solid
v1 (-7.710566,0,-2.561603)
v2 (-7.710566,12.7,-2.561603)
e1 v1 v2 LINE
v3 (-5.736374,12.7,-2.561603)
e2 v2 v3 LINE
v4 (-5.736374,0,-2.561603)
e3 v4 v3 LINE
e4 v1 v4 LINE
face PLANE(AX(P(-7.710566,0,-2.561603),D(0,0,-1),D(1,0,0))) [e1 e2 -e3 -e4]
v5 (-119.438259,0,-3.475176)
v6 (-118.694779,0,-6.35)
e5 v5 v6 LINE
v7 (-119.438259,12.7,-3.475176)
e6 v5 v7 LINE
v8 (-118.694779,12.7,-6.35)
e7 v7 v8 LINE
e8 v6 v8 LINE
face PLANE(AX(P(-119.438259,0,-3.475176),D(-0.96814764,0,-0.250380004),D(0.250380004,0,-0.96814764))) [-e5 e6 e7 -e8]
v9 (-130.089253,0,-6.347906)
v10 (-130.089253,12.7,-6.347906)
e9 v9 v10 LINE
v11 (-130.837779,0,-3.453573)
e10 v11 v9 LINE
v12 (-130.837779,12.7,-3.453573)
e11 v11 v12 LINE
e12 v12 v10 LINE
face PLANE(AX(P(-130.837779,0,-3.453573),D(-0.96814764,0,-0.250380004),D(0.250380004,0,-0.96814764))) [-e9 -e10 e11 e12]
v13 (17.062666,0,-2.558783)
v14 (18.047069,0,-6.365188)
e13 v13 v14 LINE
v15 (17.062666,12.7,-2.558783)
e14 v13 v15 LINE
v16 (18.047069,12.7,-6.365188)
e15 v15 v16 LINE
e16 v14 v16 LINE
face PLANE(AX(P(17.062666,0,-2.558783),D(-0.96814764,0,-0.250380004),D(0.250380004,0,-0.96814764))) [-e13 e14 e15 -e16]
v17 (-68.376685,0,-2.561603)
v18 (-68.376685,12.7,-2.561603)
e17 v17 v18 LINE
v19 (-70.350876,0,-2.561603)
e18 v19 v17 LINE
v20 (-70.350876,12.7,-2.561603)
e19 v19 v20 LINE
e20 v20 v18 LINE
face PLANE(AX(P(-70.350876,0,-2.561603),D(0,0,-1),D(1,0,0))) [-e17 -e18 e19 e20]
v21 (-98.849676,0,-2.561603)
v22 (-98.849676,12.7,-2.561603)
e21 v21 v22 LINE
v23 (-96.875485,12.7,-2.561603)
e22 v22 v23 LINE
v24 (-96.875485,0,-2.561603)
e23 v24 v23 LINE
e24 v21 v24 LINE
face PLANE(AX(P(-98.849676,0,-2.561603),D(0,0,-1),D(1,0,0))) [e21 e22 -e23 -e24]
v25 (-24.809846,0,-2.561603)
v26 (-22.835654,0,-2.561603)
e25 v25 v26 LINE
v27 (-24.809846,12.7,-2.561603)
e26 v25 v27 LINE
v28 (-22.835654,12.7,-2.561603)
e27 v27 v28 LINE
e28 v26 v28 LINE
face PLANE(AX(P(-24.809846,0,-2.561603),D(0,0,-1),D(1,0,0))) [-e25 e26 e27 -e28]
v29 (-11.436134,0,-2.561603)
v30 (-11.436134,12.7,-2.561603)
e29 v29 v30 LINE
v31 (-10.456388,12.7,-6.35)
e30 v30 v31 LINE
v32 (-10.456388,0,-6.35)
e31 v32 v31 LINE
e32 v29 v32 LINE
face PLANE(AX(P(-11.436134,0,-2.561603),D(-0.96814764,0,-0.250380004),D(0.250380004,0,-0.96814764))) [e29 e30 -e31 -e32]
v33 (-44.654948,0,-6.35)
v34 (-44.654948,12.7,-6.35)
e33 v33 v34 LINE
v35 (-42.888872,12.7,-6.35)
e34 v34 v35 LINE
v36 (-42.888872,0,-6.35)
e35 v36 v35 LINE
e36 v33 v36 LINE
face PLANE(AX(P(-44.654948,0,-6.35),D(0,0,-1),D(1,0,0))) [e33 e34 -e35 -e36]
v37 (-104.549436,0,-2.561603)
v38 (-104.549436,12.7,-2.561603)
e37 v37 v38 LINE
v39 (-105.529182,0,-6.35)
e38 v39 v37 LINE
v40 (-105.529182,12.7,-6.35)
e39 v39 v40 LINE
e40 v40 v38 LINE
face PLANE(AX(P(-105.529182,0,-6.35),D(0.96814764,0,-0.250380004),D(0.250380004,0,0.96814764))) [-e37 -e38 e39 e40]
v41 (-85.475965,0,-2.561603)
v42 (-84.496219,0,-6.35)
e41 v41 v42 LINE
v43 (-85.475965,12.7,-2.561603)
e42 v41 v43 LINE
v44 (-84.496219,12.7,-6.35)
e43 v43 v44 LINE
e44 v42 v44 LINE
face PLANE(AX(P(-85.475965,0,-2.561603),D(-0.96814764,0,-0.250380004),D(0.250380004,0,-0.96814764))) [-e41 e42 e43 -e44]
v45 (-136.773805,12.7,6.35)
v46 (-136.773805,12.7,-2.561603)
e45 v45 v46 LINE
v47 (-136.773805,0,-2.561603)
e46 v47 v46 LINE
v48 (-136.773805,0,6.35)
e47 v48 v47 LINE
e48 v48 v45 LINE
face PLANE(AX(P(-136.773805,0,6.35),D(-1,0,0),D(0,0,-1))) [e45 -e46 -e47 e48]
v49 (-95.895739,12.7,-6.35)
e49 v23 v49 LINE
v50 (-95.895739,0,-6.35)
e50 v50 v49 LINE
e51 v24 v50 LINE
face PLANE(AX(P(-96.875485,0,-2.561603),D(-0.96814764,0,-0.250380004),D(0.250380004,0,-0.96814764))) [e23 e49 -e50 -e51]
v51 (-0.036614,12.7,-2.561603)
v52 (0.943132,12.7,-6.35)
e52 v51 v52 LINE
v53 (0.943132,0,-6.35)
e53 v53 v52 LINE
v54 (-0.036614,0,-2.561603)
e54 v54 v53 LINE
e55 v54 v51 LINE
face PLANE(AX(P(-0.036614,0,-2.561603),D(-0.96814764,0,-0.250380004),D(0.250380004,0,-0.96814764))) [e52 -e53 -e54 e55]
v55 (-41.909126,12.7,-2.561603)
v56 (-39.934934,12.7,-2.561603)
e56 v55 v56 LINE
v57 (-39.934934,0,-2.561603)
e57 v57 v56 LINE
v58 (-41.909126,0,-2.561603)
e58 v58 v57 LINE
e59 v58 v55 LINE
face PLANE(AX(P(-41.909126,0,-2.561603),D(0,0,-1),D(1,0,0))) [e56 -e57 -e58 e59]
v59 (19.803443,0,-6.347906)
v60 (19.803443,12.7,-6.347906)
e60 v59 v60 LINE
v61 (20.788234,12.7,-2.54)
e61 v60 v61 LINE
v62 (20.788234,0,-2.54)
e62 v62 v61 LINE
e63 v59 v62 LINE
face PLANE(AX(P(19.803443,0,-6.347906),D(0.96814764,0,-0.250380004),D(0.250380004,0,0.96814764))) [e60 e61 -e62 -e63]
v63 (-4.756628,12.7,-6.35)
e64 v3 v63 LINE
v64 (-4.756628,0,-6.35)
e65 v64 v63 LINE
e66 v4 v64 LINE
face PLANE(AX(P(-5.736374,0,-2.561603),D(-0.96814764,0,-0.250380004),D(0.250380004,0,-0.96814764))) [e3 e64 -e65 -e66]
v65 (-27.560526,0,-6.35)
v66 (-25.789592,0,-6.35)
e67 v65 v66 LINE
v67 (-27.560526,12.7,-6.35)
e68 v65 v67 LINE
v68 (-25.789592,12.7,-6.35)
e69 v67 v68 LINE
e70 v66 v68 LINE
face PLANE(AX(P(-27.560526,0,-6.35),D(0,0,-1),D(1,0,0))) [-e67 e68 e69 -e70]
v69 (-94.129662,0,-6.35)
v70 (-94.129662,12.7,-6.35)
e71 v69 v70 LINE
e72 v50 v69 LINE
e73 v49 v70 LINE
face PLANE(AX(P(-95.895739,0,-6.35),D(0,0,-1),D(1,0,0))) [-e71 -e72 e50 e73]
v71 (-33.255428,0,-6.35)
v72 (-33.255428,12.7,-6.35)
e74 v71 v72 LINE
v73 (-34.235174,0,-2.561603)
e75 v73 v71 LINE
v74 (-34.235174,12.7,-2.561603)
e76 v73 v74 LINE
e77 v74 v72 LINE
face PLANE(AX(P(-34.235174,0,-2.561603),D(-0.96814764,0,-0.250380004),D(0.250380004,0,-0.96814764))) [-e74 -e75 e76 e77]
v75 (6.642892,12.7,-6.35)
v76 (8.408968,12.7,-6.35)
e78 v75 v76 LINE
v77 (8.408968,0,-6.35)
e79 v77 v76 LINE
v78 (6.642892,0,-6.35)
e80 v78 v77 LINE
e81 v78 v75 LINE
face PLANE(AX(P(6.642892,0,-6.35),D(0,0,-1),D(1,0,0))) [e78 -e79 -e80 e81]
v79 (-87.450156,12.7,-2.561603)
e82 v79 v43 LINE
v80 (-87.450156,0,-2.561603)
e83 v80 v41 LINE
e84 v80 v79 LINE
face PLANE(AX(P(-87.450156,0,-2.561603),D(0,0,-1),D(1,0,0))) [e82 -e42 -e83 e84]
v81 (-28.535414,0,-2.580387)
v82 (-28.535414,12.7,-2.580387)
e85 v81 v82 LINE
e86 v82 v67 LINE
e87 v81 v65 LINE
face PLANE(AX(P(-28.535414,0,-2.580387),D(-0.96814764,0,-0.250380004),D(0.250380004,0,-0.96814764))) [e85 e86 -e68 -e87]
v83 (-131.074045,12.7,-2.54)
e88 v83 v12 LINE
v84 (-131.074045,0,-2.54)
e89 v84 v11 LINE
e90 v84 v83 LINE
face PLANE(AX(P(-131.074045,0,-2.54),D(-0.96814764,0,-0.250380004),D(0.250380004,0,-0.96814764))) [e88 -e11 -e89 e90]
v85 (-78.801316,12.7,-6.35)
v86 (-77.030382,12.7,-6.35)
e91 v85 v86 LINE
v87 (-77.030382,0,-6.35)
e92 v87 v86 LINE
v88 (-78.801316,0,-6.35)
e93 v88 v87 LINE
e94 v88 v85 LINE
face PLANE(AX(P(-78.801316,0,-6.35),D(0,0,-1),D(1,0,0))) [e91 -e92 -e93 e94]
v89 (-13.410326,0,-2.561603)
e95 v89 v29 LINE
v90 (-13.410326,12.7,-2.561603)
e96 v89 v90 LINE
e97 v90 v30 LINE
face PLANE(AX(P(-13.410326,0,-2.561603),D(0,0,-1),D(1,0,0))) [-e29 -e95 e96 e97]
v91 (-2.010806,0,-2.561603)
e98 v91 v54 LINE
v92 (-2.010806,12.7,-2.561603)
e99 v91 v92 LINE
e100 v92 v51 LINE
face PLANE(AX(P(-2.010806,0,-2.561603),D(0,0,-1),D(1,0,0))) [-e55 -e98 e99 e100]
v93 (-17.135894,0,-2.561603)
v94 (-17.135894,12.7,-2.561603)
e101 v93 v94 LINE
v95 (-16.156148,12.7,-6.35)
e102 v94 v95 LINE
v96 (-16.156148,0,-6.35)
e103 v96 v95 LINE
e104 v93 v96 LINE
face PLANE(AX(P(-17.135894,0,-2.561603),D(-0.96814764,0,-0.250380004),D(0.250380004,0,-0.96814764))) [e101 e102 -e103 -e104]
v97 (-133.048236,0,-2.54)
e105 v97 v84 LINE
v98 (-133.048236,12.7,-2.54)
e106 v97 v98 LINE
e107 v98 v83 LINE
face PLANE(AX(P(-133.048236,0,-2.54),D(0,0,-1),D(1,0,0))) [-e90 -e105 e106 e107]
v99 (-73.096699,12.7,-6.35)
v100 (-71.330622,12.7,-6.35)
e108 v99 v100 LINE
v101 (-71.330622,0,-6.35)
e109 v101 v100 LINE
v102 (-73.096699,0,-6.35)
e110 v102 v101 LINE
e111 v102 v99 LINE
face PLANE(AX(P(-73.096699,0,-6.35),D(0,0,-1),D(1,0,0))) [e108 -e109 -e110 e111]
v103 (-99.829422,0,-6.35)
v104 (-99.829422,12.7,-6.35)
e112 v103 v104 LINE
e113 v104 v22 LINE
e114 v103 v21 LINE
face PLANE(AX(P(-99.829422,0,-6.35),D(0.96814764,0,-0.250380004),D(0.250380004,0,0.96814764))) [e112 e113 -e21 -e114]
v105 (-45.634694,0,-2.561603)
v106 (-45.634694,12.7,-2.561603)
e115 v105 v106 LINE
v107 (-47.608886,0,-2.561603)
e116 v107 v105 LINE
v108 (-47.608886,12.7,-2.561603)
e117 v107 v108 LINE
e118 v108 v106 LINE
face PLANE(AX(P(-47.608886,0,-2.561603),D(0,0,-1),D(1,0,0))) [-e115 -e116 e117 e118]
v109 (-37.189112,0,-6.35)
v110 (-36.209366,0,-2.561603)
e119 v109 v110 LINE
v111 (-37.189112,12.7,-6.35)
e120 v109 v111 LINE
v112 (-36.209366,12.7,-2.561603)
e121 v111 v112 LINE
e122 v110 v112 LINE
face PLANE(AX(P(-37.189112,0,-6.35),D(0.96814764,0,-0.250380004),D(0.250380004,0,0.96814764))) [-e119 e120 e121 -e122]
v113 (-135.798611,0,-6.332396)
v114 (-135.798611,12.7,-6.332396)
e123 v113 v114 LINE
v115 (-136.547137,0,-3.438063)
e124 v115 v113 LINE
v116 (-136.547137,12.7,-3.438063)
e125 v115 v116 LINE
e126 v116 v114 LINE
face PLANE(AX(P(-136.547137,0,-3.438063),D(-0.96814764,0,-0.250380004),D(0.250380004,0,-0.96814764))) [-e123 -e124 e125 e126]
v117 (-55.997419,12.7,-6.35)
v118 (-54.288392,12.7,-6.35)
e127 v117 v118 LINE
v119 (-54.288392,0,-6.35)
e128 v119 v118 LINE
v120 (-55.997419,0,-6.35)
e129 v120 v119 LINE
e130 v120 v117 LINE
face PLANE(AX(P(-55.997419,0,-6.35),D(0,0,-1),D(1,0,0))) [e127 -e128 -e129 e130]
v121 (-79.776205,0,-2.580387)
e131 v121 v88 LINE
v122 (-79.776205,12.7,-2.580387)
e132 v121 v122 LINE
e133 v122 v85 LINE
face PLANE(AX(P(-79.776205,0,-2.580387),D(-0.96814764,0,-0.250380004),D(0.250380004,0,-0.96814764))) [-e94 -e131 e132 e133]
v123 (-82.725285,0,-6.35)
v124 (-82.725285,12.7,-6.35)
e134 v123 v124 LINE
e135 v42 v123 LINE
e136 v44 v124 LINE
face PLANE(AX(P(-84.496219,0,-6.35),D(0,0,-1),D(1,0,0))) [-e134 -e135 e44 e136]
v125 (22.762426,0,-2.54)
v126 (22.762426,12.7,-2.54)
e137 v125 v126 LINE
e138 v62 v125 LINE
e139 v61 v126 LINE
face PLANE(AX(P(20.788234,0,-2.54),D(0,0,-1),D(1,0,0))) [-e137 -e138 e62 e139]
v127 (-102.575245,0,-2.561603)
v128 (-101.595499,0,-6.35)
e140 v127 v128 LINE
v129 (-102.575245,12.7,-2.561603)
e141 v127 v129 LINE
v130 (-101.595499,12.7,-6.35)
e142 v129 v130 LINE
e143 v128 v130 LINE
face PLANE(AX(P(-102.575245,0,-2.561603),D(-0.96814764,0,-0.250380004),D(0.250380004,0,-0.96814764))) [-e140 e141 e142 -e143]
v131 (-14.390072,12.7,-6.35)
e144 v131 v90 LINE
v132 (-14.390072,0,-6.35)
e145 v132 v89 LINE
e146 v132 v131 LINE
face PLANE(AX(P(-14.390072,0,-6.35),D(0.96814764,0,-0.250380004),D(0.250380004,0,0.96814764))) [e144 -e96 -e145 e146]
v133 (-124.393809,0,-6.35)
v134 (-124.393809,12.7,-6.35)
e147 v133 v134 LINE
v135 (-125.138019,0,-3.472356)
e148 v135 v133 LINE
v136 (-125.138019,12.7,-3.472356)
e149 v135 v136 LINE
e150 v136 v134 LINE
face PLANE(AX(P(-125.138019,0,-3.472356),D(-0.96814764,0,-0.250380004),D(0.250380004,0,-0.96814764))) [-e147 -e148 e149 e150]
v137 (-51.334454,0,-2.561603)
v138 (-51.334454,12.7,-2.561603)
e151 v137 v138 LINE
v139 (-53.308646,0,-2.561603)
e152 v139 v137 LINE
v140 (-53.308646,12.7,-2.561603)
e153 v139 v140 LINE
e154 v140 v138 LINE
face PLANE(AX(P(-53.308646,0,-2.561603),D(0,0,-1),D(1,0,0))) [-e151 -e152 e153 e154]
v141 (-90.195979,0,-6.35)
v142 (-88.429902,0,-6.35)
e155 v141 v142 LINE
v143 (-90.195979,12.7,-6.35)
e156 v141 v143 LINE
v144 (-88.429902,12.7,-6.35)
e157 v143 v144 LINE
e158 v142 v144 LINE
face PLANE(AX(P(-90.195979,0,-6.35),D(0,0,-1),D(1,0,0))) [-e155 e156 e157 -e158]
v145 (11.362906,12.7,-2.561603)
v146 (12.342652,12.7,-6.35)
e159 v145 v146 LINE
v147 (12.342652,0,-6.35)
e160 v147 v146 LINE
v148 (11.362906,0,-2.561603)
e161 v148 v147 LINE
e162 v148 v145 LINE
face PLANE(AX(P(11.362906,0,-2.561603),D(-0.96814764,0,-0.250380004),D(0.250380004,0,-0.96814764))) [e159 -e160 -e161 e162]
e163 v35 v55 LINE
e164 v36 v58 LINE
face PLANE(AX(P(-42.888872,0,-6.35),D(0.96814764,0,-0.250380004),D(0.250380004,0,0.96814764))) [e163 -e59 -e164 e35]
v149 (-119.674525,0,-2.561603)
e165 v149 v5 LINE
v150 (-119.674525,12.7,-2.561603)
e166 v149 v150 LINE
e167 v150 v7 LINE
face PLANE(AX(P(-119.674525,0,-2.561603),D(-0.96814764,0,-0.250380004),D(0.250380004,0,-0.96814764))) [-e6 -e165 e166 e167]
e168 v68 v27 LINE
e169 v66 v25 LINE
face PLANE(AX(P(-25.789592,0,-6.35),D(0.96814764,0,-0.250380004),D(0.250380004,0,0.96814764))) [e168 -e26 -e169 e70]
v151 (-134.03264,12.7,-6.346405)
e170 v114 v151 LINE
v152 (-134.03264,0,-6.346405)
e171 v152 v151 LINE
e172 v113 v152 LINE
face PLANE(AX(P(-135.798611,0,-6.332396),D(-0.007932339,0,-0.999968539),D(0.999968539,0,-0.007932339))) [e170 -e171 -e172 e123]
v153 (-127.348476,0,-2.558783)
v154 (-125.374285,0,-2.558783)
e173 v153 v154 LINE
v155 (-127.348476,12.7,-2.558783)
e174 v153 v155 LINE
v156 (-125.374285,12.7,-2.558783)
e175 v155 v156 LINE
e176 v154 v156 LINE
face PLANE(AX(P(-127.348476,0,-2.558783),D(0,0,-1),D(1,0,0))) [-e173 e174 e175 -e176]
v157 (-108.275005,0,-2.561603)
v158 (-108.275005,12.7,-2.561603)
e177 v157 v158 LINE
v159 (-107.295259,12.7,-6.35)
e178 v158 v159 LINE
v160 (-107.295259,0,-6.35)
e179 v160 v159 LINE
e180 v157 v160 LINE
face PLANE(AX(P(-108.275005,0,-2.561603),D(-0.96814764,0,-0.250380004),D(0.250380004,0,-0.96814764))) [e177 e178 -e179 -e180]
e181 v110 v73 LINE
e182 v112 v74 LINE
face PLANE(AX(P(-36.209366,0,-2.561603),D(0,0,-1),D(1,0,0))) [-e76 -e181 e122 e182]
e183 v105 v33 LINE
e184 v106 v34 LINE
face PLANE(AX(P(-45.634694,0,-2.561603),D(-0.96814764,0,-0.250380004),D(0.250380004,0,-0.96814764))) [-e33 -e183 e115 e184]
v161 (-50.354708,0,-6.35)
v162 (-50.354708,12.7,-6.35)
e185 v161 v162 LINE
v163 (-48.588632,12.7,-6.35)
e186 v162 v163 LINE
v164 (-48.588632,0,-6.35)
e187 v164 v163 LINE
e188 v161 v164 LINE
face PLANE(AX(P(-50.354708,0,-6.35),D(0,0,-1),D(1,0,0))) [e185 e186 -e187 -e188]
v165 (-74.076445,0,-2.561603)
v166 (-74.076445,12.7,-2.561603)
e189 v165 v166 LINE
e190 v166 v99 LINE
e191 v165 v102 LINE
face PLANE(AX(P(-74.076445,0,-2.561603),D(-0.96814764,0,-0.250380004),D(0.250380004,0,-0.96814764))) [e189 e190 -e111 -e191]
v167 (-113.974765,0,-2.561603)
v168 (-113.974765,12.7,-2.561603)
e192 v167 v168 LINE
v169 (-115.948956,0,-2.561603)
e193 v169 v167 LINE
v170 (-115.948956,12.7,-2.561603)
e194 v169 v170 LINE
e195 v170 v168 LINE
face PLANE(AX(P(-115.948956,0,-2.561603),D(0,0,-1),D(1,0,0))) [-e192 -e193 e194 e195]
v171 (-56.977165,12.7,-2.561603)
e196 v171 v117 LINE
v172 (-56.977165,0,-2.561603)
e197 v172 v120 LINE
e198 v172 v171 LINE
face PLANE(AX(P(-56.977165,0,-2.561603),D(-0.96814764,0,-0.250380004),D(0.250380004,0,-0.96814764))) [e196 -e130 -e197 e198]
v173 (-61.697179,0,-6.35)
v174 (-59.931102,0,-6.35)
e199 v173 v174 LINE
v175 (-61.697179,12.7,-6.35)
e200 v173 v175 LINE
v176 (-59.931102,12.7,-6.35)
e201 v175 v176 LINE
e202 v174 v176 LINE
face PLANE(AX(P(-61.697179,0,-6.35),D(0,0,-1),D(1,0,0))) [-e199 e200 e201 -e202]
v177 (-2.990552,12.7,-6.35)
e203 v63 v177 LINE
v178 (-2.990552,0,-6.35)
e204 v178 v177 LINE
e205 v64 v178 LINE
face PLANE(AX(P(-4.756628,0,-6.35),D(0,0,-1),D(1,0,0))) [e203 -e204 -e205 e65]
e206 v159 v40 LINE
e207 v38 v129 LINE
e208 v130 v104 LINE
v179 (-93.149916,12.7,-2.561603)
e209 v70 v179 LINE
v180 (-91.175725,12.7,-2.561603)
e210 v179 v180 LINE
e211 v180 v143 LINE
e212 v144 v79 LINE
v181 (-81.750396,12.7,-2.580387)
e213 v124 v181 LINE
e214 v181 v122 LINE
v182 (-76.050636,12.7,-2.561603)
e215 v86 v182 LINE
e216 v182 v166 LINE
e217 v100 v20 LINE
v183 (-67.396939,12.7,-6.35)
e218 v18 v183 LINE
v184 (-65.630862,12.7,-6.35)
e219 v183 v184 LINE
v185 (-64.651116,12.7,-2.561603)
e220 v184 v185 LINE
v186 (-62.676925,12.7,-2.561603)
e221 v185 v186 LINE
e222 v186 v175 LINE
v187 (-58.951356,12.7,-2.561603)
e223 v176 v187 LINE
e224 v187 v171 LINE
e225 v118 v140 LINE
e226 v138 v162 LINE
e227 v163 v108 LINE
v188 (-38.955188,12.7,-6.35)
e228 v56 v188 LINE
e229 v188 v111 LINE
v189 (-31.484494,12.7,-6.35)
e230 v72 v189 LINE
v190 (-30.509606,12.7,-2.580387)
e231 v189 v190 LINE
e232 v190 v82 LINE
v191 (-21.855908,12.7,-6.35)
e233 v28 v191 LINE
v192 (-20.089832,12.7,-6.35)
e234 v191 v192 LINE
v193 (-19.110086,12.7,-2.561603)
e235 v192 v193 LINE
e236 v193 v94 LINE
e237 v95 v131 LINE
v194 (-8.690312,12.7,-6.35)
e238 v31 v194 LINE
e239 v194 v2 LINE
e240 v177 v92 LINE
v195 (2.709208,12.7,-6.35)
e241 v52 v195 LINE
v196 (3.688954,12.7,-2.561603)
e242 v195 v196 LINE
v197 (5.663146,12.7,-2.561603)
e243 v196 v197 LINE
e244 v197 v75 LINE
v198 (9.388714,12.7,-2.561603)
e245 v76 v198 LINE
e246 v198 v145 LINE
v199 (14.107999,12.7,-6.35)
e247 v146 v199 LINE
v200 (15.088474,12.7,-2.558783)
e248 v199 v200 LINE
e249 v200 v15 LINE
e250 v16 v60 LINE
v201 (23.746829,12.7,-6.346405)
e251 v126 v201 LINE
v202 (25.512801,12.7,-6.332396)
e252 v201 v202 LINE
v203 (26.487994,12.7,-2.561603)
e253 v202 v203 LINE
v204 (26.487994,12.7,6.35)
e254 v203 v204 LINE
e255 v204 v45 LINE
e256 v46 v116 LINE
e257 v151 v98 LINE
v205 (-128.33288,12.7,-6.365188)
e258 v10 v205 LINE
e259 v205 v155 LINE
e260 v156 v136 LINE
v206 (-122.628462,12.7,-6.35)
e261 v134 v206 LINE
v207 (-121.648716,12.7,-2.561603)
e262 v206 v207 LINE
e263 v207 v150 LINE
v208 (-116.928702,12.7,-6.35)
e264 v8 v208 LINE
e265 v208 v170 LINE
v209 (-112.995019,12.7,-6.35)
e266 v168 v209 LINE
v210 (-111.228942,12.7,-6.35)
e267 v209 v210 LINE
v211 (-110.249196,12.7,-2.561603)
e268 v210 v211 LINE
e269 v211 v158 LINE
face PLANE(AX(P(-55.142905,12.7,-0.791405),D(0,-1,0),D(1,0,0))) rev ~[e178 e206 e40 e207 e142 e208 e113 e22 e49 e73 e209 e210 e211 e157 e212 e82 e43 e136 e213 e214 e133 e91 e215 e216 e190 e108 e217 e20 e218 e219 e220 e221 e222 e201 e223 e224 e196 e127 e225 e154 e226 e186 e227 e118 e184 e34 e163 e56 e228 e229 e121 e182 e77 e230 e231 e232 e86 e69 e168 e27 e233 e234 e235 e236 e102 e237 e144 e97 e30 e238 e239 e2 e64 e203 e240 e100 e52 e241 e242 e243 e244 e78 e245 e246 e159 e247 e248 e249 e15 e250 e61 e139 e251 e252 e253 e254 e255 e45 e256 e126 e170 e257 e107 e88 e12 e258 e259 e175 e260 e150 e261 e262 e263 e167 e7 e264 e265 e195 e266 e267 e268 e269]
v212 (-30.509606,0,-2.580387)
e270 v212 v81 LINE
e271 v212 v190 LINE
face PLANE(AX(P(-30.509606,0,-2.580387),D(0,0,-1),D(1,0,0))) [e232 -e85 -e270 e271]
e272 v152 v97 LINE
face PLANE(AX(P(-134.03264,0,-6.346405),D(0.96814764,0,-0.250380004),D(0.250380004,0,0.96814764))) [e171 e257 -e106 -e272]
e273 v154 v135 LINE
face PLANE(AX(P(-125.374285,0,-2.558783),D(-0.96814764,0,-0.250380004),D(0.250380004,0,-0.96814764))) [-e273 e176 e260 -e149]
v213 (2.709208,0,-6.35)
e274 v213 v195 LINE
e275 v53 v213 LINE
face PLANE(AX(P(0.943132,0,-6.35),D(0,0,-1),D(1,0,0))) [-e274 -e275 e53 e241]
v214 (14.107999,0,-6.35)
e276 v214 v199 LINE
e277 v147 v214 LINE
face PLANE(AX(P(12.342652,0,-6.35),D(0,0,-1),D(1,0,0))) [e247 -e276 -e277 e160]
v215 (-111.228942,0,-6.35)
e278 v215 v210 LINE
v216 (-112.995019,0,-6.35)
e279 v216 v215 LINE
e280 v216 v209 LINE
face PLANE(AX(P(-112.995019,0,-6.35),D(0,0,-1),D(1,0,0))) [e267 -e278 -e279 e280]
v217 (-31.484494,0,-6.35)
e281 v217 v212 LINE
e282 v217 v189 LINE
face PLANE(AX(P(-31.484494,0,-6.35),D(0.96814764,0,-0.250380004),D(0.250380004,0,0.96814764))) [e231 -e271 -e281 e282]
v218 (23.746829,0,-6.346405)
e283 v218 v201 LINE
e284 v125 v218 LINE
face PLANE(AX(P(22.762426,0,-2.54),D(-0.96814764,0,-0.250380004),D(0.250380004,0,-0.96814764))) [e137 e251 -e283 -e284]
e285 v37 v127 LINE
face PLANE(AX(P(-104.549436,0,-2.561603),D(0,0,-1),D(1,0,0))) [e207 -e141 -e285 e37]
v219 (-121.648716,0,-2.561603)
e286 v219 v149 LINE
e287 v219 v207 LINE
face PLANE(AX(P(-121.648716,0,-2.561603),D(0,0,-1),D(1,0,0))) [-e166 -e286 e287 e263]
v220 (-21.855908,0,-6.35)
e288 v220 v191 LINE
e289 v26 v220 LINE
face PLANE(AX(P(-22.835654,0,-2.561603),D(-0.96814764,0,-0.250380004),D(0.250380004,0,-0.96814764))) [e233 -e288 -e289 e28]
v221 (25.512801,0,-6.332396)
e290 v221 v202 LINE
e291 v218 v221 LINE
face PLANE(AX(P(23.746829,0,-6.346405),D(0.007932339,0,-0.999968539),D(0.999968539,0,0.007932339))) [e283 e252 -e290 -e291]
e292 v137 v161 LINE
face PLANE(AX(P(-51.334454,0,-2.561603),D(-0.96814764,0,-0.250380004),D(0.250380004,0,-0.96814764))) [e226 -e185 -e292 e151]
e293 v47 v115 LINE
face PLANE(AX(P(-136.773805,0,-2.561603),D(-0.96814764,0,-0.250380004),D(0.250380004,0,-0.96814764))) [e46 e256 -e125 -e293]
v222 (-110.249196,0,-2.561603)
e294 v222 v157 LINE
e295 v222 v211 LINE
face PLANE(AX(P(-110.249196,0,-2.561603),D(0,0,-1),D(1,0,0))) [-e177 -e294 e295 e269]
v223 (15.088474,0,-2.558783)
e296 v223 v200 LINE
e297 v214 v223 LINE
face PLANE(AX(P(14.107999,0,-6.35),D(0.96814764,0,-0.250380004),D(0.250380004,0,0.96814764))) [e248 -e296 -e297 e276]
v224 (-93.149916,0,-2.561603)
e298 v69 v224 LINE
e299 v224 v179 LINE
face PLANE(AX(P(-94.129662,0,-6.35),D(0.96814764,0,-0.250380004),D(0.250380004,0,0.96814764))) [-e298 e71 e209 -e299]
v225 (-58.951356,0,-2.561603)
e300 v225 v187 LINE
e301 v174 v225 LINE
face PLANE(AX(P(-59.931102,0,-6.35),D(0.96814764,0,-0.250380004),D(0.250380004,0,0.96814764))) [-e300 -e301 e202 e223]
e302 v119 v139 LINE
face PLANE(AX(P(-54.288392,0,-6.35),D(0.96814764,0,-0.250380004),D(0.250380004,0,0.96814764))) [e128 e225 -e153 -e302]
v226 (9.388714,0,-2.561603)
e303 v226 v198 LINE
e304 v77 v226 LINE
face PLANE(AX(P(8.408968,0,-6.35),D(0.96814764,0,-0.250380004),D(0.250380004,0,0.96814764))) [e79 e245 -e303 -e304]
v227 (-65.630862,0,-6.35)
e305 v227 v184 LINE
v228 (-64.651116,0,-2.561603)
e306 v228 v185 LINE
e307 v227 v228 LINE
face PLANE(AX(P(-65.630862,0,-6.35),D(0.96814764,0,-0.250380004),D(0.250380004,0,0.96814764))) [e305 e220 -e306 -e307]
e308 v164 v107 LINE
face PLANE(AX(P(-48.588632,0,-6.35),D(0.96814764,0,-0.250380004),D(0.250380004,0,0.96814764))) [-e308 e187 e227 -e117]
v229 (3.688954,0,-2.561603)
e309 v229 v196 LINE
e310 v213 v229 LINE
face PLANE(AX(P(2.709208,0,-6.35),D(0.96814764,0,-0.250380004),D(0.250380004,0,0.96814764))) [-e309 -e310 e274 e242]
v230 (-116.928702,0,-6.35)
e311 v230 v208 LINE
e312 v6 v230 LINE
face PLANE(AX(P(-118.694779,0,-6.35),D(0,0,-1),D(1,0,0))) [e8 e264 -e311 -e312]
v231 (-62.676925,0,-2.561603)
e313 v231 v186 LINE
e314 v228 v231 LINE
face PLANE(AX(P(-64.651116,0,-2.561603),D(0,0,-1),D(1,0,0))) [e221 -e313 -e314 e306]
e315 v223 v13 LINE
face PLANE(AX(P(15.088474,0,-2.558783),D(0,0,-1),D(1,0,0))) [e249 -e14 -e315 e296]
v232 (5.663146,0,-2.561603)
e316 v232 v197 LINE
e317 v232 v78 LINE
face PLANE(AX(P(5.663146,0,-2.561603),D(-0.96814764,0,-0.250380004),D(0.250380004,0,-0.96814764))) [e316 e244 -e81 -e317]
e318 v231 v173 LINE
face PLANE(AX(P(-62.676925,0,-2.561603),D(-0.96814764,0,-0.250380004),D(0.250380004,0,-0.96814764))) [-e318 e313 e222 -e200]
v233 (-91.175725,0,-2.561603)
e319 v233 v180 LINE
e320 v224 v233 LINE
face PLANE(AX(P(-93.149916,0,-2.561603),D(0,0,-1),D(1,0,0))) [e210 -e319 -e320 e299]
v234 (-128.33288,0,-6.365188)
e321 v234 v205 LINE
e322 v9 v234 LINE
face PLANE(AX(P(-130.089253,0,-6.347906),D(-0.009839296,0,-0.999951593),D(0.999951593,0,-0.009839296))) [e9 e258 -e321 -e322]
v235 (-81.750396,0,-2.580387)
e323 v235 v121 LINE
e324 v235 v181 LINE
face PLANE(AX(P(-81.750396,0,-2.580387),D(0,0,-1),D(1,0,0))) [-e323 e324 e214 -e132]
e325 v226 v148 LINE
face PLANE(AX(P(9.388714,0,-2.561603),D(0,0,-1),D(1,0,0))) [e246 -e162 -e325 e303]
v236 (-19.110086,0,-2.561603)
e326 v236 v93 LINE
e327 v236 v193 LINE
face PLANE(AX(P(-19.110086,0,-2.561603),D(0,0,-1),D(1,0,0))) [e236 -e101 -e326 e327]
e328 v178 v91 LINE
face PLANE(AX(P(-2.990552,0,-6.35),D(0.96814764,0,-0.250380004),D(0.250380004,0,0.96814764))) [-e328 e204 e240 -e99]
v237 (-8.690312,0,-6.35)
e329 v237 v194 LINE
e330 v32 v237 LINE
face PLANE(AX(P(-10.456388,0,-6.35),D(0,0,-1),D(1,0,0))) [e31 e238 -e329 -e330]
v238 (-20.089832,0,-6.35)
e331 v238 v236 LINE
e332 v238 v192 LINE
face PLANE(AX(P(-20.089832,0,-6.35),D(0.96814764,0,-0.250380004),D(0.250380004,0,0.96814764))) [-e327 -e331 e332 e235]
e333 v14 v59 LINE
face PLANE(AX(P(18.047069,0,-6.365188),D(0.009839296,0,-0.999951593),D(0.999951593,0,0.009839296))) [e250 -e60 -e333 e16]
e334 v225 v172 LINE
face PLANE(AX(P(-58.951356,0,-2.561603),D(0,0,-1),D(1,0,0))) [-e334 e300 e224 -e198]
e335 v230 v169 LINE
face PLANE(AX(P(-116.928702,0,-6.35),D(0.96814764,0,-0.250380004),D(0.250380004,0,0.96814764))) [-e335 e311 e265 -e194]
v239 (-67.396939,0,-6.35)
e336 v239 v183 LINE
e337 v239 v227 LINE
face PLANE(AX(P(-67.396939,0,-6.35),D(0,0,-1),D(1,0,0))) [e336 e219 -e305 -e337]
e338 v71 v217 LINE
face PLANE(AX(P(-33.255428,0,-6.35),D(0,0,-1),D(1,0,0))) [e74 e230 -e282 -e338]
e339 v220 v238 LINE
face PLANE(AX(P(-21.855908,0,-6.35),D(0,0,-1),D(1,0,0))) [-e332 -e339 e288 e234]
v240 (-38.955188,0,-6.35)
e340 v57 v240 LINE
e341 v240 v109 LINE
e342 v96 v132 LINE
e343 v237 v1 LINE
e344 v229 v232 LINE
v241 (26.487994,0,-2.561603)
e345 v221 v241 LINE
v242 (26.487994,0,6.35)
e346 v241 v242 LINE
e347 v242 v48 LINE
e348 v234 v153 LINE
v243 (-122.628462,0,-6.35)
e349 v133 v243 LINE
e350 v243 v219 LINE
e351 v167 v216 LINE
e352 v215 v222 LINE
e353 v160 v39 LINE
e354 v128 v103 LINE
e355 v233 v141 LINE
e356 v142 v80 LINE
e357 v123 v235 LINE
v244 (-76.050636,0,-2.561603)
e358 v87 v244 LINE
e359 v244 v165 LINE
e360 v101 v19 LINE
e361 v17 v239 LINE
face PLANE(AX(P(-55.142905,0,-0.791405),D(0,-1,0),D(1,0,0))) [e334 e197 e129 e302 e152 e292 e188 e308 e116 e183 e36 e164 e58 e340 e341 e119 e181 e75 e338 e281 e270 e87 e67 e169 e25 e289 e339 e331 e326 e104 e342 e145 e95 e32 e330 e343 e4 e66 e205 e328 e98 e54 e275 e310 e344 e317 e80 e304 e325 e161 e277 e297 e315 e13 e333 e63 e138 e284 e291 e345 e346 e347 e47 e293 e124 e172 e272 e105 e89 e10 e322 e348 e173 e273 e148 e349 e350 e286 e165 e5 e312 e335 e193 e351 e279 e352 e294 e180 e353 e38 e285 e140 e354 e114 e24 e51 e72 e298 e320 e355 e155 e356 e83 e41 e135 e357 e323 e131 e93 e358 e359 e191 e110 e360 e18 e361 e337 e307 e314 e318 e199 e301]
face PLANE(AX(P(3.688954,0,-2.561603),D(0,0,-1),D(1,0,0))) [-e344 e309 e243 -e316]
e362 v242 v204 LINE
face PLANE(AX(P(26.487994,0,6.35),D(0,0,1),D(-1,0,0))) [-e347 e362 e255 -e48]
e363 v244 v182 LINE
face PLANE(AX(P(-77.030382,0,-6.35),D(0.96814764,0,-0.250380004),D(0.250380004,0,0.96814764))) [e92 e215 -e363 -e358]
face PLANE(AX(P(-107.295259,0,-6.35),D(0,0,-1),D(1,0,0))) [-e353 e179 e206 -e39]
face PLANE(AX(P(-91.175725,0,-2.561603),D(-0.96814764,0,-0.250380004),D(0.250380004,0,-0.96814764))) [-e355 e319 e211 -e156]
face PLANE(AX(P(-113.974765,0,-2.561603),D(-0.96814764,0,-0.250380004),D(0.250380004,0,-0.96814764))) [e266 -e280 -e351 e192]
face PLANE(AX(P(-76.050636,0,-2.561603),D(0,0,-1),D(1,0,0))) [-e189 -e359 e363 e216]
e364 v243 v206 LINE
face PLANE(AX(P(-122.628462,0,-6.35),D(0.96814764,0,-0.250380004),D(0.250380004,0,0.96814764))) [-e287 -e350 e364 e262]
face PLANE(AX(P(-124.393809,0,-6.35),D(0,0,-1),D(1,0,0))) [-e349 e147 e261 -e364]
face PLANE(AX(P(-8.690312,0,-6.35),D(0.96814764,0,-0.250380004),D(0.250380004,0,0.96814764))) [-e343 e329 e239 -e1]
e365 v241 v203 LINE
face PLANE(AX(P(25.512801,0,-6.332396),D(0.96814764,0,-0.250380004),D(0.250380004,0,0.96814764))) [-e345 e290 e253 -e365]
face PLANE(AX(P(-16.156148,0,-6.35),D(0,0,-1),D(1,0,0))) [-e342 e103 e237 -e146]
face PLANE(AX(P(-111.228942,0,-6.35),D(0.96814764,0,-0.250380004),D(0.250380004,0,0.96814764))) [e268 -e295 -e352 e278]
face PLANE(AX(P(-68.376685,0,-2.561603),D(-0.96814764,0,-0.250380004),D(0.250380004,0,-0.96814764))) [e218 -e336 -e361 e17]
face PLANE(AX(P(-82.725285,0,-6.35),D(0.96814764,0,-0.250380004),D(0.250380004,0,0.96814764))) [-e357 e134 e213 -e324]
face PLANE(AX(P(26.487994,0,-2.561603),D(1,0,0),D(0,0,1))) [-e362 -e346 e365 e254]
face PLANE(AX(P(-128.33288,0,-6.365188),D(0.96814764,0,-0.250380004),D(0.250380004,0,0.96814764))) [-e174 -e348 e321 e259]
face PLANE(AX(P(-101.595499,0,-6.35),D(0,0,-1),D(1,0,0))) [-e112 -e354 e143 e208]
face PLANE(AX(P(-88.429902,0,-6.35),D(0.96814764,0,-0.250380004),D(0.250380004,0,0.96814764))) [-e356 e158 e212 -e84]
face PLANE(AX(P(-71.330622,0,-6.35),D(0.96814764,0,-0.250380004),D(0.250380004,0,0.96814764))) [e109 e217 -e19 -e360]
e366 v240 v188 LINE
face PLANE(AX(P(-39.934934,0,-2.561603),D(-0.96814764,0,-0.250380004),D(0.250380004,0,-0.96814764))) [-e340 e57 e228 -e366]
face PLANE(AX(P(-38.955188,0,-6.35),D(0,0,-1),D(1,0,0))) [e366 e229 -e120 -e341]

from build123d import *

# Parameters (mm, degrees)
F1_DEPTH = 12.7


# Not quite as in the source:
# - a feature of the source that left no trace in its solid (it failed there, or was rolled back) is left out


with BuildPart() as f1:
    # F0 (on Front) → F1 (new body)
    with BuildSketch(Plane.XZ):
        Polygon((26.4879943687, -2.5616034378), (26.4879943687, 6.35), (-136.7738045981, 6.35), (-136.7738045981, -2.5616034378), (-136.5471367316, -3.4380630457), (-135.7986113058, -6.3323961114), (-134.0326395944, -6.346404838), (-133.0482363701, -2.54), (-131.0740445981, -2.54), (-130.837778613, -3.4535727787), (-130.0892531872, -6.3479058444), (-128.3328795944, -6.3651881602), (-127.3484763701, -2.5587833222), (-125.3742845981, -2.5587833222), (-125.138018613, -3.4723561009), (-124.3938092991, -6.35), (-122.9682044968, -6.35), (-122.6284623376, -6.35), (-121.6487163701, -2.5616034378), (-119.6745245981, -2.5616034378), (-119.438258613, -3.4751762165), (-118.6947786306, -6.35), (-117.8373619914, -6.35), (-117.2674353611, -6.35), (-116.9287023376, -6.35), (-115.9489563701, -2.5616034378), (-113.9747645981, -2.5616034378), (-112.9950186306, -6.35), (-112.1405051147, -6.35), (-111.2289423376, -6.35), (-110.2491963701, -2.5616034378), (-108.2750045981, -2.5616034378), (-107.2952586306, -6.35), (-106.4407451147, -6.35), (-105.5291823376, -6.35), (-104.5494363701, -2.5616034378), (-102.5752445981, -2.5616034378), (-101.5954986306, -6.35), (-100.7409851147, -6.35), (-99.8294223376, -6.35), (-98.8496763701, -2.5616034378), (-96.8754845981, -2.5616034378), (-95.8957386306, -6.35), (-95.0412251147, -6.35), (-94.1296623376, -6.35), (-93.1499163701, -2.5616034378), (-91.1757245981, -2.5616034378), (-90.1959786306, -6.35), (-89.3414651147, -6.35), (-88.4299023376, -6.35), (-87.4501563701, -2.5616034378), (-85.4759645981, -2.5616034378), (-84.4962186306, -6.35), (-82.7252846402, -6.35), (-81.7503963701, -2.58038676), (-79.7762045981, -2.58038676), (-78.801316328, -6.35), (-77.9419451147, -6.35), (-77.0303823376, -6.35), (-76.0506363701, -2.5616034378), (-74.0764445981, -2.5616034378), (-73.0966986306, -6.35), (-72.2421851147, -6.35), (-71.3306223376, -6.35), (-70.3508763701, -2.5616034378), (-68.3766845981, -2.5616034378), (-67.3969386306, -6.35), (-66.5424251147, -6.35), (-65.6308623376, -6.35), (-64.6511163701, -2.5616034378), (-62.6769245981, -2.5616034378), (-61.6971786306, -6.35), (-60.8426651147, -6.35), (-59.9311023376, -6.35), (-58.9513563701, -2.5616034378), (-56.9771645981, -2.5616034378), (-55.9974186306, -6.35), (-54.2883915989, -6.35), (-53.3086456314, -2.5616034378), (-53.2515963701, -2.5616034378), (-51.3344538594, -2.5616034378), (-50.3547078919, -6.35), (-49.4431451147, -6.35), (-48.5886315989, -6.35), (-47.6088856314, -2.5616034378), (-45.6346938594, -2.5616034378), (-44.6549478919, -6.35), (-43.7433851147, -6.35), (-42.8888715989, -6.35), (-41.9091256314, -2.5616034378), (-39.9349338594, -2.5616034378), (-38.9551878919, -6.35), (-38.0436251147, -6.35), (-37.1891115989, -6.35), (-36.2093656314, -2.5616034378), (-34.2351738594, -2.5616034378), (-33.2554278919, -6.35), (-32.3438651147, -6.35), (-31.4844939015, -6.35), (-30.5096056314, -2.58038676), (-28.5354138594, -2.58038676), (-27.5605255893, -6.35), (-25.7895915989, -6.35), (-24.8098456314, -2.5616034378), (-22.8356538594, -2.5616034378), (-21.8559078919, -6.35), (-20.9443451147, -6.35), (-20.0898315989, -6.35), (-19.1100856314, -2.5616034378), (-17.1358938594, -2.5616034378), (-16.1561478919, -6.35), (-15.2445851147, -6.35), (-14.3900715989, -6.35), (-13.4103256314, -2.5616034378), (-11.4361338594, -2.5616034378), (-10.4563878919, -6.35), (-9.5448251147, -6.35), (-8.6903115989, -6.35), (-7.7105656314, -2.5616034378), (-5.7363738594, -2.5616034378), (-4.7566278919, -6.35), (-3.8450651147, -6.35), (-2.9905515989, -6.35), (-2.0108056314, -2.5616034378), (-0.0366138594, -2.5616034378), (0.9431321081, -6.35), (1.8546948853, -6.35), (2.7092084011, -6.35), (3.6889543686, -2.5616034378), (5.6631461406, -2.5616034378), (6.6428921081, -6.35), (8.4089684011, -6.35), (9.3887143686, -2.5616034378), (11.3629061406, -2.5616034378), (12.3426521081, -6.35), (14.1079990696, -6.35), (15.0884743686, -2.5587833222), (17.0626661406, -2.5587833222), (18.0470693649, -6.3651881602), (19.8034429577, -6.3479058444), (20.7882343686, -2.54), (22.7624261406, -2.54), (23.7468293649, -6.346404838), (25.5128010763, -6.3323961114), align=None)
    extrude(amount=-F1_DEPTH)


solid = f1.part
